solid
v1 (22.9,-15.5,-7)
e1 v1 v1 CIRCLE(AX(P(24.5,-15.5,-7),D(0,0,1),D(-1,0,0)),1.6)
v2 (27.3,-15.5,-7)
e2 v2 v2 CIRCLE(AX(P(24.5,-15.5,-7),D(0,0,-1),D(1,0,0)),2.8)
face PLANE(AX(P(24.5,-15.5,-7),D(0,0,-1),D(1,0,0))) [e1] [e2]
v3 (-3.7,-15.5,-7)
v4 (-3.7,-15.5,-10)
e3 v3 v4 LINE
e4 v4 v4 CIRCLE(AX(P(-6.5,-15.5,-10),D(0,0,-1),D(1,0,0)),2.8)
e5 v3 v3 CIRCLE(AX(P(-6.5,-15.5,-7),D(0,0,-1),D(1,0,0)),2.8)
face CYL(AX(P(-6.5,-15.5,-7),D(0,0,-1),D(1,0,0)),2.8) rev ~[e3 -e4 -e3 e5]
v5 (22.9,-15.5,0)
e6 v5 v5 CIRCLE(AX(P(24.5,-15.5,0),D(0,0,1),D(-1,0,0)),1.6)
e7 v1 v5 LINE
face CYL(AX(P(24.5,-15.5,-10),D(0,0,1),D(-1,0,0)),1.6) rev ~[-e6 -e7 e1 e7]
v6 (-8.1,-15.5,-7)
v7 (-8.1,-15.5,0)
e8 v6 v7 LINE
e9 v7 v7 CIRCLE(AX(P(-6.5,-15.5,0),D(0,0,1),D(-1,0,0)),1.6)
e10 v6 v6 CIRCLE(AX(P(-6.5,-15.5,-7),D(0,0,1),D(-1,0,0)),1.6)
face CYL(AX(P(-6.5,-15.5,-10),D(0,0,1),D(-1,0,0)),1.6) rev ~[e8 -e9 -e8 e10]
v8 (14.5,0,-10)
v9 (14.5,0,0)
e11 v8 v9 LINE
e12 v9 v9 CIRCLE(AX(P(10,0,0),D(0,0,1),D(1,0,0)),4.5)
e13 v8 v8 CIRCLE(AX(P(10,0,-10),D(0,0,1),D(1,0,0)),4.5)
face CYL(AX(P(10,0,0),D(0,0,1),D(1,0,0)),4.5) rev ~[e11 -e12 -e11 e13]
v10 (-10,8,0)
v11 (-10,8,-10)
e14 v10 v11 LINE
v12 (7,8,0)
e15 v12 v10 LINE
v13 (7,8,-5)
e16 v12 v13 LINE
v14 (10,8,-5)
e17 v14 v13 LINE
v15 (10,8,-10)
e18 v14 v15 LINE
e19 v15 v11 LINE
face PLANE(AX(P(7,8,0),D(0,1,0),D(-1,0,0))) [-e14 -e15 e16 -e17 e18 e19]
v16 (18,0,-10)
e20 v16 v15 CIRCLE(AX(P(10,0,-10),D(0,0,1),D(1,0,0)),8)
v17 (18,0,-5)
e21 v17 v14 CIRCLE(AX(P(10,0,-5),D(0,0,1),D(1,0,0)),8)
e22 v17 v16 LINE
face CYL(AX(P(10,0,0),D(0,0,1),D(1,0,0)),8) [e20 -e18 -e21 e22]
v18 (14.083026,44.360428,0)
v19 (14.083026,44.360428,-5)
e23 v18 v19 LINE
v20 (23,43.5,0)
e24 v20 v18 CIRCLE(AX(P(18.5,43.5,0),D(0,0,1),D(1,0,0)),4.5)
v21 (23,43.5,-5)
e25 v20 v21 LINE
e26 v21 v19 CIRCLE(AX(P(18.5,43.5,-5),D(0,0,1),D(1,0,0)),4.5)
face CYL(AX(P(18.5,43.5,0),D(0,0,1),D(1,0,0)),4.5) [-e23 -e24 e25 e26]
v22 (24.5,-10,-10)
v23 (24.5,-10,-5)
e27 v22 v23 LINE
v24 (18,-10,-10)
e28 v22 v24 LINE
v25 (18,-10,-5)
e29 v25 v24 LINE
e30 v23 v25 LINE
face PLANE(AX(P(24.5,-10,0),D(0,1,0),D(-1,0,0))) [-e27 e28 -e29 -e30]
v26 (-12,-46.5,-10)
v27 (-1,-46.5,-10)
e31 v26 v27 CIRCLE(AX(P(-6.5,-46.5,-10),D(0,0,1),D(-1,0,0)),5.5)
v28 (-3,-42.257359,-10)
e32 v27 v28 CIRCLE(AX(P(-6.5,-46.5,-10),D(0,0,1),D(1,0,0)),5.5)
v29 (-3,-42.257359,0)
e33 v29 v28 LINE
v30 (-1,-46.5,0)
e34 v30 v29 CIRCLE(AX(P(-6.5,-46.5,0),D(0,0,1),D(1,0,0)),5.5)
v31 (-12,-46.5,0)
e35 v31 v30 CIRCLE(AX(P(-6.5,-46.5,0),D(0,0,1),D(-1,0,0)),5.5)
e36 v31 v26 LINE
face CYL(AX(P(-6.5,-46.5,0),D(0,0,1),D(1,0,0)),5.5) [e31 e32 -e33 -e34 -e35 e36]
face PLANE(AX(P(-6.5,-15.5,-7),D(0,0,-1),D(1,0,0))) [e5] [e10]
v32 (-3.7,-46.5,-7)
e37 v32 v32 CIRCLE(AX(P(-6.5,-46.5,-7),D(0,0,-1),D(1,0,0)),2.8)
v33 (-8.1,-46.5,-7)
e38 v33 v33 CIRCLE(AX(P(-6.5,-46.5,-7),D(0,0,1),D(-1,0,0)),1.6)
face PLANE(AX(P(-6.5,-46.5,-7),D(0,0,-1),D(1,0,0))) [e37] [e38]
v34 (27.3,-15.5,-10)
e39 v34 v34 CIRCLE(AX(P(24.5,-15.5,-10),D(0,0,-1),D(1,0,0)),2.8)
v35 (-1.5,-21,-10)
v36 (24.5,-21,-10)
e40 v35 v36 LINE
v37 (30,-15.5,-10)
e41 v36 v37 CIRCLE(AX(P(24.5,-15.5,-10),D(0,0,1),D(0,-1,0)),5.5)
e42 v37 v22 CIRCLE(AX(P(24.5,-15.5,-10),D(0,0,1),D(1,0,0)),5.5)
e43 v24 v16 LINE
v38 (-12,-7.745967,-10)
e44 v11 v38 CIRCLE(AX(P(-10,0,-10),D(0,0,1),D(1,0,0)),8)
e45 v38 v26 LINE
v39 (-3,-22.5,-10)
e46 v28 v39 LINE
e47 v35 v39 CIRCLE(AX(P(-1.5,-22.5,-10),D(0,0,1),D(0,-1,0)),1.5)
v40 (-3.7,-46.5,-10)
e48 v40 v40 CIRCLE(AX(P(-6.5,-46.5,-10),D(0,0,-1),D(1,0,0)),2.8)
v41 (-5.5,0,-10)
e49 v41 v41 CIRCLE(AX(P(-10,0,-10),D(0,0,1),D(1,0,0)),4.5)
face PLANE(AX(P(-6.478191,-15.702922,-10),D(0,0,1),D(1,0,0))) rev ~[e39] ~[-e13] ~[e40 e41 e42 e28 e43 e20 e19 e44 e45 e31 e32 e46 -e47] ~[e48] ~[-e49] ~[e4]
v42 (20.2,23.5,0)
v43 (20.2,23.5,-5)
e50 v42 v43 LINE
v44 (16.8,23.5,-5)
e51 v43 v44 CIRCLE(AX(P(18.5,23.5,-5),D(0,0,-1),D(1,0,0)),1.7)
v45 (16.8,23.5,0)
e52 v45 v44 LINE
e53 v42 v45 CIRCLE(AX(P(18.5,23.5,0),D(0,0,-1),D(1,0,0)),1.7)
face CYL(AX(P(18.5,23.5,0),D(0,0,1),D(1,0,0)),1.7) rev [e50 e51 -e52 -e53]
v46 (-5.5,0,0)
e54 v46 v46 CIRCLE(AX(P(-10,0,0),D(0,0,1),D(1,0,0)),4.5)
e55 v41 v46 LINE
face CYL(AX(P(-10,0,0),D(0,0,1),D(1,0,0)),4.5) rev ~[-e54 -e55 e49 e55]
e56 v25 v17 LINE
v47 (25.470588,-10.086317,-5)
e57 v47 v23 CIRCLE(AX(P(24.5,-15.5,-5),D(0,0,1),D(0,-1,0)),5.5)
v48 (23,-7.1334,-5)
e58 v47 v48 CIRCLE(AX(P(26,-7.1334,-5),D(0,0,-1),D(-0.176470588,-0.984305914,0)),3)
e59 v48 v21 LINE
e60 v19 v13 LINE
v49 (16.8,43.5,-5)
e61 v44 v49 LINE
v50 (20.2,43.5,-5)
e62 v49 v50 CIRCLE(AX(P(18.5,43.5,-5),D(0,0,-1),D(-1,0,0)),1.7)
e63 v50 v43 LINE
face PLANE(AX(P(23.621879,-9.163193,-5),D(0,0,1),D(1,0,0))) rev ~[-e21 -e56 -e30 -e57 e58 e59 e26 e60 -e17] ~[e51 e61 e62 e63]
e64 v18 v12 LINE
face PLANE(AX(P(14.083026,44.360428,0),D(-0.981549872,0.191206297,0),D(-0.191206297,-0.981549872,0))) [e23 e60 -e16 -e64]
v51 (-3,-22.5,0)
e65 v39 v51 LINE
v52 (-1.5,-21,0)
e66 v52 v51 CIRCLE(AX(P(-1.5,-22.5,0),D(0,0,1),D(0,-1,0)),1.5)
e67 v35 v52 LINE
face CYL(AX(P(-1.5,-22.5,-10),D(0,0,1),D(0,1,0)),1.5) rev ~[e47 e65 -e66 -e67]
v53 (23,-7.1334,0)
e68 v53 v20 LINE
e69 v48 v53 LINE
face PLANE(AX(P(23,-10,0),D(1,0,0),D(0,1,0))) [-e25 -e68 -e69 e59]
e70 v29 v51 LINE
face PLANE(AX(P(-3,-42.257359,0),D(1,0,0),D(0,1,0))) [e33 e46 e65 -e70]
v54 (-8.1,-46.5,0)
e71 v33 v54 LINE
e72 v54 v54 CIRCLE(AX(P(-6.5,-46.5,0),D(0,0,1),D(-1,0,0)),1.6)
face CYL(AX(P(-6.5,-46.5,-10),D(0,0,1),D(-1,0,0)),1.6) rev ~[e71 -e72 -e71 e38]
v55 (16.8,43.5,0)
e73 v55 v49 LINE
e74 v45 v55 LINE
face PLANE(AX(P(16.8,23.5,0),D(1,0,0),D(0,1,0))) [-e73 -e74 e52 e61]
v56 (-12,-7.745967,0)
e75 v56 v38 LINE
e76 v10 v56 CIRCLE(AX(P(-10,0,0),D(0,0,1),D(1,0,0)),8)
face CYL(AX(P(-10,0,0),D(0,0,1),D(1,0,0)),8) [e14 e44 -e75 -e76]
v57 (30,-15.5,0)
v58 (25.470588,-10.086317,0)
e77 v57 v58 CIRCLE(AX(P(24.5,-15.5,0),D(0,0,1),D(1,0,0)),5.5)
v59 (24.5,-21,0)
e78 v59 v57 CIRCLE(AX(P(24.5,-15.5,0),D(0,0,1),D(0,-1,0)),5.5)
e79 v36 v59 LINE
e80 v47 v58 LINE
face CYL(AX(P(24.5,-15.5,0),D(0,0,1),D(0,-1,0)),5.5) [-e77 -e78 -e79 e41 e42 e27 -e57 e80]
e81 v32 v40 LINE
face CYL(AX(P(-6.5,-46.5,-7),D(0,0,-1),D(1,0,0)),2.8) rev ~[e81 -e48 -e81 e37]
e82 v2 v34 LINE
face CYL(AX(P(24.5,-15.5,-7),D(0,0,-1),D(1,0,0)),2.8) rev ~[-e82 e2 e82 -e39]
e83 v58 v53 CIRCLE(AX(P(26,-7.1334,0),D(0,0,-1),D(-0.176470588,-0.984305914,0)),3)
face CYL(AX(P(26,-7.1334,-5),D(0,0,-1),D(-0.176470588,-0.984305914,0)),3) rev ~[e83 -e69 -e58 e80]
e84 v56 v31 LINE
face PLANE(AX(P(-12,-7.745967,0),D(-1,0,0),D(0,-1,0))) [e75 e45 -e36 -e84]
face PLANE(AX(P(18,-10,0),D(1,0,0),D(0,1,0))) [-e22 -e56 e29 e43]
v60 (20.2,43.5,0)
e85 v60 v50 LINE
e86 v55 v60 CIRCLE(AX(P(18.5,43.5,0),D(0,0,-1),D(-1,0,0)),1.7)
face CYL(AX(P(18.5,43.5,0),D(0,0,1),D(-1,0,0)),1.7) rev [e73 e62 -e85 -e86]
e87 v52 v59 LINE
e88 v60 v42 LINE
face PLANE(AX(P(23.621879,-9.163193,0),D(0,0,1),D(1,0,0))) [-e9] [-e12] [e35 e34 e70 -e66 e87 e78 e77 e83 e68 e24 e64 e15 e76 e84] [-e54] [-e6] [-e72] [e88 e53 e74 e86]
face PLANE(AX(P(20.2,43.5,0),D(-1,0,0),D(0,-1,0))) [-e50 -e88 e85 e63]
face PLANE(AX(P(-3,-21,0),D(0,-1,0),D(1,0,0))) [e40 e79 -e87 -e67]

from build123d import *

# Parameters (mm, degrees)
F0_R           = 4.5
F1_DEPTH       = 5
F2_DEPTH       = 10
F4_D           = 3.2
F4_CBORE_D     = 5.6
F4_CBORE_DEPTH = 3
F5_T1_DEPTH    = 5
F6_R           = 1.5


# Not quite as in the source:
# - a fillet or chamfer that OpenCascade refuses, or shapes differently, is made with other operations: its cross-section is extruded or revolved along the edge and cut away or added
# - a feature names something its author has since deleted; it is built from what else it names


with BuildPart() as f1:
    # F0 (on Top) → F1 (new body)
    with BuildSketch(Plane.XY):
        with BuildLine():
            ThreePointArc((-12, -7.7459666924), (-5.1010205144, -6.3245553203), (-2, 0))
            ThreePointArc((-2, 0), (-4.3431457505, 5.6568542495), (-10, 8))
            ThreePointArc((-10, 8), (-17.9362375701, 1.0080343399), (-12, -7.7459666924))
        make_face()
        with Locations((-10, 0)):
            Circle(F0_R, mode=Mode.SUBTRACT)
        with BuildLine():
            ThreePointArc((-10, 8), (-4.3431457505, 5.6568542495), (-2, 0))
            ThreePointArc((-2, 0), (-5.1010205144, -6.3245553203), (-12, -7.7459666924))
            Line((-12, -7.7459666924), (-12, -15.5))
            ThreePointArc((-12, -15.5), (-6.5, -10), (-1, -15.5))
            ThreePointArc((-1, -15.5), (-1.5250628145, -17.8452078799), (-3, -19.7426406871))
            Line((-3, -19.7426406871), (-3, -21))
            Line((-3, -21), (18, -21))
            Line((18, -21), (18, -10))
            Line((18, -10), (18, 0))
            ThreePointArc((18, 0), (4.3431457505, -5.6568542495), (10, 8))
            Line((10, 8), (7, 8))
            Line((7, 8), (-10, 8))
        make_face()
        with BuildLine():
            Line((14.083025574, 44.3604283352), (7, 8))
            Line((7, 8), (10, 8))
            ThreePointArc((10, 8), (15.6568542495, 5.6568542495), (18, 0))
            Line((18, 0), (18, -10))
            Line((18, -10), (23, -10))
            Line((23, -10), (23, 43.5))
            ThreePointArc((23, 43.5), (22.2349698794, 40.9900199204), (20.2, 39.3334666688))
            Line((20.2, 39.3334666688), (20.2, 23.5))
            ThreePointArc((20.2, 23.5), (18.5, 21.8), (16.8, 23.5))
            Line((16.8, 23.5), (16.8, 39.3334666688))
            ThreePointArc((16.8, 39.3334666688), (14.5412211566, 41.3603574904), (14.083025574, 44.3604283352))
        make_face()
        with BuildLine():
            ThreePointArc((-1, -15.5), (-6.5, -10), (-12, -15.5))
            ThreePointArc((-12, -15.5), (-10.3890872965, -19.3890872965), (-6.5, -21))
            ThreePointArc((-6.5, -21), (-4.6405005753, -20.676124215), (-3, -19.7426406871))
            ThreePointArc((-3, -19.7426406871), (-1.5250628145, -17.8452078799), (-1, -15.5))
        make_face()
        with BuildLine():
            ThreePointArc((-6.5, -21), (-10.3890872965, -19.3890872965), (-12, -15.5))
            Line((-12, -15.5), (-12, -46.5))
            ThreePointArc((-12, -46.5), (-8.8452078799, -41.5250628145), (-3, -42.2573593129))
            Line((-3, -42.2573593129), (-3, -21))
            Line((-3, -21), (-6.5, -21))
        make_face()
        with BuildLine():
            ThreePointArc((23, 43.5), (18.9322123801, 47.9791955147), (14.083025574, 44.3604283352))
            ThreePointArc((14.083025574, 44.3604283352), (14.5412211566, 41.3603574904), (16.8, 39.3334666688))
            Line((16.8, 39.3334666688), (16.8, 43.5))
            ThreePointArc((16.8, 43.5), (18.5, 45.2), (20.2, 43.5))
            Line((20.2, 43.5), (20.2, 39.3334666688))
            ThreePointArc((20.2, 39.3334666688), (22.2349698794, 40.9900199204), (23, 43.5))
        make_face()
        with BuildLine():
            ThreePointArc((-3, -19.7426406871), (-4.6405005753, -20.676124215), (-6.5, -21))
            Line((-6.5, -21), (-3, -21))
            Line((-3, -21), (-3, -19.7426406871))
        make_face()
        with BuildLine():
            ThreePointArc((-3, -42.2573593129), (-8.8452078799, -41.5250628145), (-12, -46.5))
            ThreePointArc((-12, -46.5), (-6.5, -52), (-1, -46.5))
            ThreePointArc((-1, -46.5), (-1.5250628145, -44.1547921201), (-3, -42.2573593129))
        make_face()
        with BuildLine():
            Line((23, -10), (18, -10))
            Line((18, -10), (18, -21))
            Line((18, -21), (24.5, -21))
            ThreePointArc((24.5, -21), (19, -15.5), (24.5, -10))
            Line((24.5, -10), (23, -10))
        make_face()
        with BuildLine():
            ThreePointArc((30, -15.5), (28.3890872965, -11.6109127035), (24.5, -10))
            ThreePointArc((24.5, -10), (19, -15.5), (24.5, -21))
            ThreePointArc((24.5, -21), (28.3890872965, -19.3890872965), (30, -15.5))
        make_face()
        with BuildLine():
            ThreePointArc((18, 0), (15.6568542495, 5.6568542495), (10, 8))
            ThreePointArc((10, 8), (4.3431457505, -5.6568542495), (18, 0))
        make_face()
        with Locations((10, 0)):
            Circle(F0_R, mode=Mode.SUBTRACT)
    extrude(amount=-F1_DEPTH)

    # F0 (on Top) → F2 (join)
    with BuildSketch(Plane.XY):
        with BuildLine():
            ThreePointArc((30, -15.5), (28.3890872965, -11.6109127035), (24.5, -10))
            ThreePointArc((24.5, -10), (19, -15.5), (24.5, -21))
            ThreePointArc((24.5, -21), (28.3890872965, -19.3890872965), (30, -15.5))
        make_face()
        with BuildLine():
            ThreePointArc((-3, -42.2573593129), (-8.8452078799, -41.5250628145), (-12, -46.5))
            ThreePointArc((-12, -46.5), (-6.5, -52), (-1, -46.5))
            ThreePointArc((-1, -46.5), (-1.5250628145, -44.1547921201), (-3, -42.2573593129))
        make_face()
        with BuildLine():
            ThreePointArc((-12, -7.7459666924), (-5.1010205144, -6.3245553203), (-2, 0))
            ThreePointArc((-2, 0), (-4.3431457505, 5.6568542495), (-10, 8))
            ThreePointArc((-10, 8), (-17.9362375701, 1.0080343399), (-12, -7.7459666924))
        make_face()
        with Locations((-10, 0)):
            Circle(F0_R, mode=Mode.SUBTRACT)
        with BuildLine():
            ThreePointArc((-1, -15.5), (-6.5, -10), (-12, -15.5))
            ThreePointArc((-12, -15.5), (-10.3890872965, -19.3890872965), (-6.5, -21))
            ThreePointArc((-6.5, -21), (-4.6405005753, -20.676124215), (-3, -19.7426406871))
            ThreePointArc((-3, -19.7426406871), (-1.5250628145, -17.8452078799), (-1, -15.5))
        make_face()
        with BuildLine():
            ThreePointArc((-6.5, -21), (-10.3890872965, -19.3890872965), (-12, -15.5))
            Line((-12, -15.5), (-12, -46.5))
            ThreePointArc((-12, -46.5), (-8.8452078799, -41.5250628145), (-3, -42.2573593129))
            Line((-3, -42.2573593129), (-3, -21))
            Line((-3, -21), (-6.5, -21))
        make_face()
        with BuildLine():
            ThreePointArc((-3, -19.7426406871), (-4.6405005753, -20.676124215), (-6.5, -21))
            Line((-6.5, -21), (-3, -21))
            Line((-3, -21), (-3, -19.7426406871))
        make_face()
        with BuildLine():
            Line((23, -10), (18, -10))
            Line((18, -10), (18, -21))
            Line((18, -21), (24.5, -21))
            ThreePointArc((24.5, -21), (19, -15.5), (24.5, -10))
            Line((24.5, -10), (23, -10))
        make_face()
        with BuildLine():
            ThreePointArc((-10, 8), (-4.3431457505, 5.6568542495), (-2, 0))
            ThreePointArc((-2, 0), (-5.1010205144, -6.3245553203), (-12, -7.7459666924))
            Line((-12, -7.7459666924), (-12, -15.5))
            ThreePointArc((-12, -15.5), (-6.5, -10), (-1, -15.5))
            ThreePointArc((-1, -15.5), (-1.5250628145, -17.8452078799), (-3, -19.7426406871))
            Line((-3, -19.7426406871), (-3, -21))
            Line((-3, -21), (18, -21))
            Line((18, -21), (18, -10))
            Line((18, -10), (18, 0))
            ThreePointArc((18, 0), (4.3431457505, -5.6568542495), (10, 8))
            Line((10, 8), (7, 8))
            Line((7, 8), (-10, 8))
        make_face()
        with BuildLine():
            ThreePointArc((18, 0), (15.6568542495, 5.6568542495), (10, 8))
            ThreePointArc((10, 8), (4.3431457505, -5.6568542495), (18, 0))
        make_face()
        with Locations((10, 0)):
            Circle(F0_R, mode=Mode.SUBTRACT)
    extrude(amount=-F2_DEPTH)

    # F4 (through all)
    with Locations(Plane(origin=(0, 0, -10), x_dir=(1, 0, 0), z_dir=(0, 0, -1))):
        with Locations((-6.5, 46.5), (-6.5, 15.5), (24.5, 15.5)):
            CounterBoreHole(F4_D / 2, F4_CBORE_D / 2, F4_CBORE_DEPTH)

    # F5: fillet of radius 3 on 1 edges, made by hand

    # F5_s2 → F5_t1 (join)
    with BuildSketch(Plane.XY.offset(-5)):
        with BuildLine():
            ThreePointArc((25.4705882353, -10.0863174754), (23.6991050335, -9.0584665784), (23, -7.1333997347))
            Line((23, -7.1333997347), (22.7, -7.1333997347))
            Line((22.7, -7.1333997347), (22.7, -10))
            Line((22.7, -10), (23, -10.3))
            ThreePointArc((23, -10.3), (24.5, -10.3), (25.4176470588, -10.3816092494))
            Line((25.4176470588, -10.3816092494), (25.4705882353, -10.0863174754))
        make_face()
    extrude(amount=F5_T1_DEPTH)

    # F6
    f6_edges = [f1.edges().sort_by_distance(p)[0] for p in [
        (-3, -21, -5),
    ]]
    fillet(f6_edges, radius=F6_R)


solid = f1.part
